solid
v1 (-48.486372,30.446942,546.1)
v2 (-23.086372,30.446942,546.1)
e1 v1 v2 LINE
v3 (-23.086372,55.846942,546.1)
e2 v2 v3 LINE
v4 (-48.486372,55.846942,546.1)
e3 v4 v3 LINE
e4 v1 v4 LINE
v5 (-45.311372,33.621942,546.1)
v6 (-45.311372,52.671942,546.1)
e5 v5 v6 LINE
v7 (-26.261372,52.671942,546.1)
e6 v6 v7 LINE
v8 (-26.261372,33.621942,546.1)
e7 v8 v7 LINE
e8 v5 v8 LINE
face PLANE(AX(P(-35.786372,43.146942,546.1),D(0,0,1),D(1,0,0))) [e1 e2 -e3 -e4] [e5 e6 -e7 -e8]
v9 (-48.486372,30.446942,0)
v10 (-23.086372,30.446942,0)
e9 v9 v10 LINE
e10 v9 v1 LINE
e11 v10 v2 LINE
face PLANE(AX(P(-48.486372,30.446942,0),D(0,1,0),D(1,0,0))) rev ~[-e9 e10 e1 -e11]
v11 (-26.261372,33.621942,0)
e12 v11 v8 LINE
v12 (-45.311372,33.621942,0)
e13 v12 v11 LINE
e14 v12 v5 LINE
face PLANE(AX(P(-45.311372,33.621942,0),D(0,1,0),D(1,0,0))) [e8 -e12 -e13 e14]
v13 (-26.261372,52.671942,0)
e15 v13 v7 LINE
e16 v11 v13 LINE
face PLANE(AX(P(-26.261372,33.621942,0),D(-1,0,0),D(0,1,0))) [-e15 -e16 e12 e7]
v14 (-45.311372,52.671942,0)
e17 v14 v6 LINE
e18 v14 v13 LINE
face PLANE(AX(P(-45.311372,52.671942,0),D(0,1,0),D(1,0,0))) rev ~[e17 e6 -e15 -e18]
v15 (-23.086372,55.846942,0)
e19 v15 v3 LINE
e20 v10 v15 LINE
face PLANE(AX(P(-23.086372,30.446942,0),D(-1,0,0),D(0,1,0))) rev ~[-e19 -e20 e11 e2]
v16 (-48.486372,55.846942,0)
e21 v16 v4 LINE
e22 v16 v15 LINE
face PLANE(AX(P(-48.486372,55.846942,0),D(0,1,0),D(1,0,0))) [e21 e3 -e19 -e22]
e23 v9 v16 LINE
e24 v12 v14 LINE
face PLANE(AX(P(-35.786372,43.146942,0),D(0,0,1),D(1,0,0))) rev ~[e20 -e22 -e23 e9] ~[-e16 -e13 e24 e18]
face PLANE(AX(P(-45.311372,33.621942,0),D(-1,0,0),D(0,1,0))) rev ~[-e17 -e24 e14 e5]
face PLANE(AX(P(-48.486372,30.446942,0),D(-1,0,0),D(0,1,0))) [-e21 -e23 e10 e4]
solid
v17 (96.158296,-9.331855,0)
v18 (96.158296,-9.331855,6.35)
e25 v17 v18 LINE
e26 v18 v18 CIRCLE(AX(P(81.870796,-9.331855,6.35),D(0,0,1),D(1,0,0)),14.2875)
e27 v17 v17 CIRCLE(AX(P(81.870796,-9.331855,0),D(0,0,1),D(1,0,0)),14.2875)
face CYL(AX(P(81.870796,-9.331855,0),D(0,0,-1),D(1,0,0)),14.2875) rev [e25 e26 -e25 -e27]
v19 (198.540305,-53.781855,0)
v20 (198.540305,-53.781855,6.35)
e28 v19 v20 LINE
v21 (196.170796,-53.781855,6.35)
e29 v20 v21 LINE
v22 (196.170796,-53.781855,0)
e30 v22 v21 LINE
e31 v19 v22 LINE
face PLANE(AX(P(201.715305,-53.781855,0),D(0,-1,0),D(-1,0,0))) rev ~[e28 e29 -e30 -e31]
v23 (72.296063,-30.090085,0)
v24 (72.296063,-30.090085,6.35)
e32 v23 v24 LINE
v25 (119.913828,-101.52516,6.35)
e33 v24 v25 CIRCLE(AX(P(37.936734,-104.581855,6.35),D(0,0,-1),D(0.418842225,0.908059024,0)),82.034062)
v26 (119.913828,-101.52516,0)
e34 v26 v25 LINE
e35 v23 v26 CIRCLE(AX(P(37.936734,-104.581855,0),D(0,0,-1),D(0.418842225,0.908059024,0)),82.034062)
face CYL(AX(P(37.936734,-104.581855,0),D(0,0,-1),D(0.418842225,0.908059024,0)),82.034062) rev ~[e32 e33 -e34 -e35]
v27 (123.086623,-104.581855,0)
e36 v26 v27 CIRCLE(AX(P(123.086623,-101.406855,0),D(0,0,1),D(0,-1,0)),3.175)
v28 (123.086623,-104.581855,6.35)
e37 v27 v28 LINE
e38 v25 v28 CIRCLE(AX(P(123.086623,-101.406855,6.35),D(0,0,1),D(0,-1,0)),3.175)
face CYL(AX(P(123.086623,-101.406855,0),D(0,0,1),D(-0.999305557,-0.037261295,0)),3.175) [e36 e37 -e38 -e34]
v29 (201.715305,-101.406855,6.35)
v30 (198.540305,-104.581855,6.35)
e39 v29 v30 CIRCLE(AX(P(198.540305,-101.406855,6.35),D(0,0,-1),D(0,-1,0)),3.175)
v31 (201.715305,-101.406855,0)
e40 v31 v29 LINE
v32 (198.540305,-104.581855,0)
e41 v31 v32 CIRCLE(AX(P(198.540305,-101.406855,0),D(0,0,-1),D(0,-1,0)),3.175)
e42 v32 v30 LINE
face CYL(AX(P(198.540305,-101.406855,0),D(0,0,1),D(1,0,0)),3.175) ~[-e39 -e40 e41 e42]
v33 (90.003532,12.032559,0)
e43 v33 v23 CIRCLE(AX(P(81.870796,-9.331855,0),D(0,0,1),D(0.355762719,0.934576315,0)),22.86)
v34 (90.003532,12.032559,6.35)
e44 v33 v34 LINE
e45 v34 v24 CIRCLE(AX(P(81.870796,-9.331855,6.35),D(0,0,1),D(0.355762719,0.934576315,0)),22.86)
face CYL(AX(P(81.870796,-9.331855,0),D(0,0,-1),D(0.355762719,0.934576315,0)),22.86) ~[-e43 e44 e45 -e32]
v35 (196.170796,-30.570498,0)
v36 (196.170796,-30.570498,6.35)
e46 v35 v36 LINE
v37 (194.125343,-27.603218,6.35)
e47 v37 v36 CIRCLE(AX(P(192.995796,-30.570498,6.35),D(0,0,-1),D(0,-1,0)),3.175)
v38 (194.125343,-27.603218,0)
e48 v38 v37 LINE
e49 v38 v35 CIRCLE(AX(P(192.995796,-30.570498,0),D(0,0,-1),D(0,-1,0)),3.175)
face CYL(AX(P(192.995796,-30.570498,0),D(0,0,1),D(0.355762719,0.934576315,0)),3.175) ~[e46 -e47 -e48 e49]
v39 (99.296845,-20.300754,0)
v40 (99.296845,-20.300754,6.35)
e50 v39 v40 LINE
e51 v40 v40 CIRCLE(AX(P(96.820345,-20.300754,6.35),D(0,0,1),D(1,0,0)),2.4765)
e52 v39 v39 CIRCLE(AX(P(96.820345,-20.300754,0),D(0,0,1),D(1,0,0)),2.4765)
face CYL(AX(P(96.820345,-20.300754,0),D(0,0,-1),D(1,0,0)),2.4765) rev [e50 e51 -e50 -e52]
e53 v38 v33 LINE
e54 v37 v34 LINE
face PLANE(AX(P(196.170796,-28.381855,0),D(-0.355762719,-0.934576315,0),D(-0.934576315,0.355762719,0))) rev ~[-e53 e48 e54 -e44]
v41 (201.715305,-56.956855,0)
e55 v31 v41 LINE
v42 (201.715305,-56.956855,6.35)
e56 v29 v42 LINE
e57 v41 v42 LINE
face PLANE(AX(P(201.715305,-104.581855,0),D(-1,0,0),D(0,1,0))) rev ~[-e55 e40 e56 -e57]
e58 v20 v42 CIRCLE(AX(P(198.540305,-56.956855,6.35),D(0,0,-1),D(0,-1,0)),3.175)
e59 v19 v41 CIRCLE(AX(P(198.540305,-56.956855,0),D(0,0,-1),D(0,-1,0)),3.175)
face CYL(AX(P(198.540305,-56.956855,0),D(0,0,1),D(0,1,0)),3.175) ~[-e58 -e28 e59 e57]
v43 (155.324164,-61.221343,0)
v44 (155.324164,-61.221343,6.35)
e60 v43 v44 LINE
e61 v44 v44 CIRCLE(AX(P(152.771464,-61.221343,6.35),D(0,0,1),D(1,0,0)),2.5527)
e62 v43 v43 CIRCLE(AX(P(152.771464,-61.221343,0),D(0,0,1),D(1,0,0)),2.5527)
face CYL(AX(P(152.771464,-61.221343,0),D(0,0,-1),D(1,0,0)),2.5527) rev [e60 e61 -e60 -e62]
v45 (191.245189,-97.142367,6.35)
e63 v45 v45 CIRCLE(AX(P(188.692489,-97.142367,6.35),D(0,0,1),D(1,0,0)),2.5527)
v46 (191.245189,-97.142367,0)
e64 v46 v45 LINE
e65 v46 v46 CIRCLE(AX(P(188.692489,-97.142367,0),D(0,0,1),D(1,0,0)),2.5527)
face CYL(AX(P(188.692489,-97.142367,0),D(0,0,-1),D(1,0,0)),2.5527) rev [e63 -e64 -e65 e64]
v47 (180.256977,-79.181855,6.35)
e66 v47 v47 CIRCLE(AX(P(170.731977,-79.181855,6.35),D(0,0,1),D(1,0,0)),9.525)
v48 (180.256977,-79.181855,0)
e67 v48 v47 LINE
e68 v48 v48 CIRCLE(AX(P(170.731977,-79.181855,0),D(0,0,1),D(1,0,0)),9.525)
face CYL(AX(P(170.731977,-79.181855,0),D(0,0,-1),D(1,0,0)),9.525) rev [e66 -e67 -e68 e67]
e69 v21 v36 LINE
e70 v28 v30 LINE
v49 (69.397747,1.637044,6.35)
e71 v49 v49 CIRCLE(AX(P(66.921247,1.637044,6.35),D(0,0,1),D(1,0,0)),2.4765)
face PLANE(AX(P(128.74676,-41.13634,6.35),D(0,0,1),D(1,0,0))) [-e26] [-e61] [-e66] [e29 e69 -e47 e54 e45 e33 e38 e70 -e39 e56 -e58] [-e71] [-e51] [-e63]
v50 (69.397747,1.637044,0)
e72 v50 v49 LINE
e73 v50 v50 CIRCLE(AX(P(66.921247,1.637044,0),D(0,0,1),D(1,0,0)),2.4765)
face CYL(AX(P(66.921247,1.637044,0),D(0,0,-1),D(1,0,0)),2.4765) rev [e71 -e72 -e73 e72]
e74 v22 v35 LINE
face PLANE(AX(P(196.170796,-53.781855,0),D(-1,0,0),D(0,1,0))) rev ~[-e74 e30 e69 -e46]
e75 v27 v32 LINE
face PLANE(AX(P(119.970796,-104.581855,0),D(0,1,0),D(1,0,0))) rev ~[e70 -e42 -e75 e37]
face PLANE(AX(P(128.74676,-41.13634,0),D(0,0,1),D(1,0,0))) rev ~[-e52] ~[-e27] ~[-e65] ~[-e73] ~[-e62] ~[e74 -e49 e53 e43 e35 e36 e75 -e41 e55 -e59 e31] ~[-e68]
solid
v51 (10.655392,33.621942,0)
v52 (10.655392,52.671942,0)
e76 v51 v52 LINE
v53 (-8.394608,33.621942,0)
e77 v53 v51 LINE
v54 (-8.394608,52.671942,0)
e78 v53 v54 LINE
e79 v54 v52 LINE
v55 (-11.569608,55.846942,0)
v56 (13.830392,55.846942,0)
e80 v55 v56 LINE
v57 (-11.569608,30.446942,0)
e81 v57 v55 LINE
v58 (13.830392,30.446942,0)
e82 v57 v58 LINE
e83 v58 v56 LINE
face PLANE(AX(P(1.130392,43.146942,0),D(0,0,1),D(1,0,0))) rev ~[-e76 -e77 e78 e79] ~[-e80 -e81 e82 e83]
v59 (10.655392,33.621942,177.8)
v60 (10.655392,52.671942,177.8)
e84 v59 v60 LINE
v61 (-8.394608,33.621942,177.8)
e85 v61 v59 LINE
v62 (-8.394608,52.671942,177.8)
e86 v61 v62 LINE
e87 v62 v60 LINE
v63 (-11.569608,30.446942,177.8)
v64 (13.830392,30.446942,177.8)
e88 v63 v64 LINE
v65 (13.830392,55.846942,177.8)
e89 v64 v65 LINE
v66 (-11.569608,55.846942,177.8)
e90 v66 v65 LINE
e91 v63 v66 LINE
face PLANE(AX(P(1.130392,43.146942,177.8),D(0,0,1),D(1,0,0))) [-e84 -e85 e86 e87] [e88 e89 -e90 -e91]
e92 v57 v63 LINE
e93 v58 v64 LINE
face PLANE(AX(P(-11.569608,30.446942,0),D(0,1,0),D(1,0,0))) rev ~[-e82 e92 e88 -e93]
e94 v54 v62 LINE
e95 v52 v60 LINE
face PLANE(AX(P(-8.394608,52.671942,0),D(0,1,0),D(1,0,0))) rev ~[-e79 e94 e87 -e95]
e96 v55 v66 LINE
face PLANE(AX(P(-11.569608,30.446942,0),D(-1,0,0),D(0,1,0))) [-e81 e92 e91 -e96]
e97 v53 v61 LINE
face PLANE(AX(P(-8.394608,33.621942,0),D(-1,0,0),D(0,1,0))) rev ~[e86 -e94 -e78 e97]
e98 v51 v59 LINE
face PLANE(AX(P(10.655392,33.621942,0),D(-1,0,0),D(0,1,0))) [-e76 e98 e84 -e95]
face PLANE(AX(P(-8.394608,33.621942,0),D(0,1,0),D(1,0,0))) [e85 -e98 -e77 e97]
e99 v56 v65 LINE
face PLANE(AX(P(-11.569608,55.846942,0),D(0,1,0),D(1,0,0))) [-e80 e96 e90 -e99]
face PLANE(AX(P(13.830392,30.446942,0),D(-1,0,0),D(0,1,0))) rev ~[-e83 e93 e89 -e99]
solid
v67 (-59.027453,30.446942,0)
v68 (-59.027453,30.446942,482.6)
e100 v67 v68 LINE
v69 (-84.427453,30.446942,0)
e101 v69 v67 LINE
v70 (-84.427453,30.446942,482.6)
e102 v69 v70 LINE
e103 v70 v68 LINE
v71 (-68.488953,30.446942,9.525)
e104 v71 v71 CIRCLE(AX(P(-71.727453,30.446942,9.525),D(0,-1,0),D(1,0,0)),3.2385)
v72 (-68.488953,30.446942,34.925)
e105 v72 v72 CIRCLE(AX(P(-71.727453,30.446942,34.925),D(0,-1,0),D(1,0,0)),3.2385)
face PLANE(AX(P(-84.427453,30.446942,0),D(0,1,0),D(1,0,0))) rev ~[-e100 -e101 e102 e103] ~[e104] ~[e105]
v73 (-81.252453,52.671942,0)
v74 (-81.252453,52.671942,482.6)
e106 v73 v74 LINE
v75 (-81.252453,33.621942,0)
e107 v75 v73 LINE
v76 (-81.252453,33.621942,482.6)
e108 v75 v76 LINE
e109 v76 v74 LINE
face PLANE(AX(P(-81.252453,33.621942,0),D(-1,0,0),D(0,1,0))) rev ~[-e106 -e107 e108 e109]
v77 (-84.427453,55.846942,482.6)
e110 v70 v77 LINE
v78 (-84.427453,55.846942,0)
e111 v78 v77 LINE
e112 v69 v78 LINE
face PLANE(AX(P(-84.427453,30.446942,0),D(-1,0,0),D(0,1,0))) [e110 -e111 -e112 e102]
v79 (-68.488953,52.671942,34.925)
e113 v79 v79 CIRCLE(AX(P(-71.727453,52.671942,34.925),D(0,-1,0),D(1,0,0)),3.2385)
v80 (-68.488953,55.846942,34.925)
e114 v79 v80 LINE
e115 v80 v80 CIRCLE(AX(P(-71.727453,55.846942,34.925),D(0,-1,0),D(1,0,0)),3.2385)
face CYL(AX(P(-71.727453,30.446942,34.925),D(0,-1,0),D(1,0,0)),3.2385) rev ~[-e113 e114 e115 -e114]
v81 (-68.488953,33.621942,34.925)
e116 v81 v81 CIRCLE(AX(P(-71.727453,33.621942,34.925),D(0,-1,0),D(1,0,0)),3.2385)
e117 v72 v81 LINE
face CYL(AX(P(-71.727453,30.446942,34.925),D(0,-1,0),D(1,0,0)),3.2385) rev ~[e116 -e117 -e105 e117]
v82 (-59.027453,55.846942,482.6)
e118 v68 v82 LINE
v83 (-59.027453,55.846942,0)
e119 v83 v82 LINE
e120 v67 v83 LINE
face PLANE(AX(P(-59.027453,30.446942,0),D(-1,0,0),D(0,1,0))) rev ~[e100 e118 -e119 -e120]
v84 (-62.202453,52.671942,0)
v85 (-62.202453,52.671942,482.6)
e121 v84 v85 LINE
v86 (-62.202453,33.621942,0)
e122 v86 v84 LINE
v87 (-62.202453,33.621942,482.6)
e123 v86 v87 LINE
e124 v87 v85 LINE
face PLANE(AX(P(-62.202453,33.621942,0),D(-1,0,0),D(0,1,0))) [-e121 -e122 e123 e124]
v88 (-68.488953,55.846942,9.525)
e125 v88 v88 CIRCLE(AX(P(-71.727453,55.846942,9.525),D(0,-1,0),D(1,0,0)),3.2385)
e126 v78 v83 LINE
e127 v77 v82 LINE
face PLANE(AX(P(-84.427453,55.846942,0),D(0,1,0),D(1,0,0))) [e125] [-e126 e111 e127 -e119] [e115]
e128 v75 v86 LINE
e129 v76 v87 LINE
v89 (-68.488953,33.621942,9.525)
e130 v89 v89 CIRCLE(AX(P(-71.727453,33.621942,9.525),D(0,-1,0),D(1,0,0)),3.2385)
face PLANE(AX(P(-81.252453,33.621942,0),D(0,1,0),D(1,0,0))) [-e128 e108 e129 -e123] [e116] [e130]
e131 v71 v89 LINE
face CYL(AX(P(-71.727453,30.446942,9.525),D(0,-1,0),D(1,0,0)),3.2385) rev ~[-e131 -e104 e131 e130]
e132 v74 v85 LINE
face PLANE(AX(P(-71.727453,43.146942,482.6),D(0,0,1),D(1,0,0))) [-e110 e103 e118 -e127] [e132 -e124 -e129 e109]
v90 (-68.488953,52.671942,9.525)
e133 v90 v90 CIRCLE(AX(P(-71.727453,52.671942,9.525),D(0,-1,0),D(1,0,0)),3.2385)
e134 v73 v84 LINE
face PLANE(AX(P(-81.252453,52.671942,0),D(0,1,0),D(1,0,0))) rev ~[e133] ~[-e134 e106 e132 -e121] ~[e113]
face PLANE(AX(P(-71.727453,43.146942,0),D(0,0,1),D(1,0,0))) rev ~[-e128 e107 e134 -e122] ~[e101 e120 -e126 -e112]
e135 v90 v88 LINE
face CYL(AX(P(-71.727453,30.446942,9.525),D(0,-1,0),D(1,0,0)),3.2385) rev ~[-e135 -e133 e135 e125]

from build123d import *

# Parameters (mm, degrees)
F0_W     = 25.4
F0_H     = 25.4
F0_W_2   = 19.05
F0_H_2   = 19.05
F1_DEPTH = 482.6
F2_R     = 3.2385
F3_DEPTH = 25.4
F4_DEPTH = 546.1
F5_DEPTH = 177.8
F6_R     = 2.4765
F6_R_2   = 14.2875
F6_R_3   = 2.5527
F6_R_4   = 9.525
F7_DEPTH = 6.35
F8_R     = 3.175


# Not quite as in the source:
# - a length typed as a fraction of an inch, garbled in the dataset ("3 / 203.2 mm" for 3/8 in), is restored


with BuildPart() as f1:
    # F0 (on Top) → F1 (new body)
    with BuildSketch(Plane.XY):
        with Locations((-71.7274532759, 43.1469418108)):
            Rectangle(F0_W, F0_H)
        with Locations((-71.7274532759, 43.1469418108)):
            Rectangle(F0_W_2, F0_H_2, mode=Mode.SUBTRACT)
    extrude(amount=F1_DEPTH)

    # F2 (on face) → F3 (cut, through all)
    with BuildSketch(Plane.XZ.offset(-30.4469418108)):
        with Locations((-71.7274532759, 34.925)):
            Circle(F2_R)
        with Locations((-71.7274532759, 9.525)):
            Circle(F2_R)
    extrude(amount=-F3_DEPTH, mode=Mode.SUBTRACT)


with BuildPart() as f4:
    # F0 (on Top) → F4 (new body)
    with BuildSketch(Plane.XY):
        with Locations((-35.7863716781, 43.1469418108)):
            Rectangle(F0_W, F0_H)
        with Locations((-35.7863716781, 43.1469418108)):
            Rectangle(F0_W_2, F0_H_2, mode=Mode.SUBTRACT)
    extrude(amount=F4_DEPTH)


with BuildPart() as f5:
    # F0 (on Top) → F5 (new body)
    with BuildSketch(Plane.XY):
        with Locations((1.1303923199, 43.1469418108)):
            Rectangle(F0_W, F0_H)
        with Locations((1.1303923199, 43.1469418108)):
            Rectangle(F0_W_2, F0_H_2, mode=Mode.SUBTRACT)
    extrude(amount=F5_DEPTH)


with BuildPart() as f7:
    # F6 (on Top) → F7 (new body)
    with BuildSketch(Plane.XY):
        with BuildLine():
            Line((196.1707963228, -28.3818552375), (90.0035320812, 12.032559313))
            ThreePointArc((90.0035320812, 12.032559313), (60.7971369321, -0.4729343166), (72.2960630652, -30.0900845224))
            ThreePointArc((72.2960630652, -30.0900845224), (107.0316785467, -60.3610906142), (119.9707963228, -104.5818552375))
            Line((119.9707963228, -104.5818552375), (145.3707963228, -104.5818552375))
            Line((145.3707963228, -104.5818552375), (145.3707963228, -53.7818552375))
            Line((145.3707963228, -53.7818552375), (196.1707963228, -53.7818552375))
            Line((196.1707963228, -53.7818552375), (196.1707963228, -28.3818552375))
        make_face()
        with Locations((96.8203453355, -20.3007543763)):
            Circle(F6_R, mode=Mode.SUBTRACT)
        with Locations((81.8707963228, -9.3318552375)):
            Circle(F6_R_2, mode=Mode.SUBTRACT)
        with Locations((66.9212473101, 1.6370439013)):
            Circle(F6_R, mode=Mode.SUBTRACT)
        Polygon((201.7153054476, -53.7818552375), (196.1707963228, -53.7818552375), (145.3707963228, -53.7818552375), (145.3707963228, -104.5818552375), (201.7153054476, -104.5818552375), align=None)
        with Locations((188.6924888704, -97.1423674796)):
            Circle(F6_R_3, mode=Mode.SUBTRACT)
        with Locations((170.7319766283, -79.1818552375)):
            Circle(F6_R_4, mode=Mode.SUBTRACT)
        with Locations((152.7714643862, -61.2213429953)):
            Circle(F6_R_3, mode=Mode.SUBTRACT)
    extrude(amount=F7_DEPTH)

    # F8
    f8_edges = [f7.edges().sort_by_distance(p)[0] for p in [
        (196.170796, -28.381855, 3.175),
        (119.970796, -104.581855, 3.175),
        (201.715305, -53.781855, 3.175),
        (201.715305, -104.581855, 3.175),
    ]]
    fillet(f8_edges, radius=F8_R)


solid = Compound([f1.part, f4.part, f5.part, f7.part])
